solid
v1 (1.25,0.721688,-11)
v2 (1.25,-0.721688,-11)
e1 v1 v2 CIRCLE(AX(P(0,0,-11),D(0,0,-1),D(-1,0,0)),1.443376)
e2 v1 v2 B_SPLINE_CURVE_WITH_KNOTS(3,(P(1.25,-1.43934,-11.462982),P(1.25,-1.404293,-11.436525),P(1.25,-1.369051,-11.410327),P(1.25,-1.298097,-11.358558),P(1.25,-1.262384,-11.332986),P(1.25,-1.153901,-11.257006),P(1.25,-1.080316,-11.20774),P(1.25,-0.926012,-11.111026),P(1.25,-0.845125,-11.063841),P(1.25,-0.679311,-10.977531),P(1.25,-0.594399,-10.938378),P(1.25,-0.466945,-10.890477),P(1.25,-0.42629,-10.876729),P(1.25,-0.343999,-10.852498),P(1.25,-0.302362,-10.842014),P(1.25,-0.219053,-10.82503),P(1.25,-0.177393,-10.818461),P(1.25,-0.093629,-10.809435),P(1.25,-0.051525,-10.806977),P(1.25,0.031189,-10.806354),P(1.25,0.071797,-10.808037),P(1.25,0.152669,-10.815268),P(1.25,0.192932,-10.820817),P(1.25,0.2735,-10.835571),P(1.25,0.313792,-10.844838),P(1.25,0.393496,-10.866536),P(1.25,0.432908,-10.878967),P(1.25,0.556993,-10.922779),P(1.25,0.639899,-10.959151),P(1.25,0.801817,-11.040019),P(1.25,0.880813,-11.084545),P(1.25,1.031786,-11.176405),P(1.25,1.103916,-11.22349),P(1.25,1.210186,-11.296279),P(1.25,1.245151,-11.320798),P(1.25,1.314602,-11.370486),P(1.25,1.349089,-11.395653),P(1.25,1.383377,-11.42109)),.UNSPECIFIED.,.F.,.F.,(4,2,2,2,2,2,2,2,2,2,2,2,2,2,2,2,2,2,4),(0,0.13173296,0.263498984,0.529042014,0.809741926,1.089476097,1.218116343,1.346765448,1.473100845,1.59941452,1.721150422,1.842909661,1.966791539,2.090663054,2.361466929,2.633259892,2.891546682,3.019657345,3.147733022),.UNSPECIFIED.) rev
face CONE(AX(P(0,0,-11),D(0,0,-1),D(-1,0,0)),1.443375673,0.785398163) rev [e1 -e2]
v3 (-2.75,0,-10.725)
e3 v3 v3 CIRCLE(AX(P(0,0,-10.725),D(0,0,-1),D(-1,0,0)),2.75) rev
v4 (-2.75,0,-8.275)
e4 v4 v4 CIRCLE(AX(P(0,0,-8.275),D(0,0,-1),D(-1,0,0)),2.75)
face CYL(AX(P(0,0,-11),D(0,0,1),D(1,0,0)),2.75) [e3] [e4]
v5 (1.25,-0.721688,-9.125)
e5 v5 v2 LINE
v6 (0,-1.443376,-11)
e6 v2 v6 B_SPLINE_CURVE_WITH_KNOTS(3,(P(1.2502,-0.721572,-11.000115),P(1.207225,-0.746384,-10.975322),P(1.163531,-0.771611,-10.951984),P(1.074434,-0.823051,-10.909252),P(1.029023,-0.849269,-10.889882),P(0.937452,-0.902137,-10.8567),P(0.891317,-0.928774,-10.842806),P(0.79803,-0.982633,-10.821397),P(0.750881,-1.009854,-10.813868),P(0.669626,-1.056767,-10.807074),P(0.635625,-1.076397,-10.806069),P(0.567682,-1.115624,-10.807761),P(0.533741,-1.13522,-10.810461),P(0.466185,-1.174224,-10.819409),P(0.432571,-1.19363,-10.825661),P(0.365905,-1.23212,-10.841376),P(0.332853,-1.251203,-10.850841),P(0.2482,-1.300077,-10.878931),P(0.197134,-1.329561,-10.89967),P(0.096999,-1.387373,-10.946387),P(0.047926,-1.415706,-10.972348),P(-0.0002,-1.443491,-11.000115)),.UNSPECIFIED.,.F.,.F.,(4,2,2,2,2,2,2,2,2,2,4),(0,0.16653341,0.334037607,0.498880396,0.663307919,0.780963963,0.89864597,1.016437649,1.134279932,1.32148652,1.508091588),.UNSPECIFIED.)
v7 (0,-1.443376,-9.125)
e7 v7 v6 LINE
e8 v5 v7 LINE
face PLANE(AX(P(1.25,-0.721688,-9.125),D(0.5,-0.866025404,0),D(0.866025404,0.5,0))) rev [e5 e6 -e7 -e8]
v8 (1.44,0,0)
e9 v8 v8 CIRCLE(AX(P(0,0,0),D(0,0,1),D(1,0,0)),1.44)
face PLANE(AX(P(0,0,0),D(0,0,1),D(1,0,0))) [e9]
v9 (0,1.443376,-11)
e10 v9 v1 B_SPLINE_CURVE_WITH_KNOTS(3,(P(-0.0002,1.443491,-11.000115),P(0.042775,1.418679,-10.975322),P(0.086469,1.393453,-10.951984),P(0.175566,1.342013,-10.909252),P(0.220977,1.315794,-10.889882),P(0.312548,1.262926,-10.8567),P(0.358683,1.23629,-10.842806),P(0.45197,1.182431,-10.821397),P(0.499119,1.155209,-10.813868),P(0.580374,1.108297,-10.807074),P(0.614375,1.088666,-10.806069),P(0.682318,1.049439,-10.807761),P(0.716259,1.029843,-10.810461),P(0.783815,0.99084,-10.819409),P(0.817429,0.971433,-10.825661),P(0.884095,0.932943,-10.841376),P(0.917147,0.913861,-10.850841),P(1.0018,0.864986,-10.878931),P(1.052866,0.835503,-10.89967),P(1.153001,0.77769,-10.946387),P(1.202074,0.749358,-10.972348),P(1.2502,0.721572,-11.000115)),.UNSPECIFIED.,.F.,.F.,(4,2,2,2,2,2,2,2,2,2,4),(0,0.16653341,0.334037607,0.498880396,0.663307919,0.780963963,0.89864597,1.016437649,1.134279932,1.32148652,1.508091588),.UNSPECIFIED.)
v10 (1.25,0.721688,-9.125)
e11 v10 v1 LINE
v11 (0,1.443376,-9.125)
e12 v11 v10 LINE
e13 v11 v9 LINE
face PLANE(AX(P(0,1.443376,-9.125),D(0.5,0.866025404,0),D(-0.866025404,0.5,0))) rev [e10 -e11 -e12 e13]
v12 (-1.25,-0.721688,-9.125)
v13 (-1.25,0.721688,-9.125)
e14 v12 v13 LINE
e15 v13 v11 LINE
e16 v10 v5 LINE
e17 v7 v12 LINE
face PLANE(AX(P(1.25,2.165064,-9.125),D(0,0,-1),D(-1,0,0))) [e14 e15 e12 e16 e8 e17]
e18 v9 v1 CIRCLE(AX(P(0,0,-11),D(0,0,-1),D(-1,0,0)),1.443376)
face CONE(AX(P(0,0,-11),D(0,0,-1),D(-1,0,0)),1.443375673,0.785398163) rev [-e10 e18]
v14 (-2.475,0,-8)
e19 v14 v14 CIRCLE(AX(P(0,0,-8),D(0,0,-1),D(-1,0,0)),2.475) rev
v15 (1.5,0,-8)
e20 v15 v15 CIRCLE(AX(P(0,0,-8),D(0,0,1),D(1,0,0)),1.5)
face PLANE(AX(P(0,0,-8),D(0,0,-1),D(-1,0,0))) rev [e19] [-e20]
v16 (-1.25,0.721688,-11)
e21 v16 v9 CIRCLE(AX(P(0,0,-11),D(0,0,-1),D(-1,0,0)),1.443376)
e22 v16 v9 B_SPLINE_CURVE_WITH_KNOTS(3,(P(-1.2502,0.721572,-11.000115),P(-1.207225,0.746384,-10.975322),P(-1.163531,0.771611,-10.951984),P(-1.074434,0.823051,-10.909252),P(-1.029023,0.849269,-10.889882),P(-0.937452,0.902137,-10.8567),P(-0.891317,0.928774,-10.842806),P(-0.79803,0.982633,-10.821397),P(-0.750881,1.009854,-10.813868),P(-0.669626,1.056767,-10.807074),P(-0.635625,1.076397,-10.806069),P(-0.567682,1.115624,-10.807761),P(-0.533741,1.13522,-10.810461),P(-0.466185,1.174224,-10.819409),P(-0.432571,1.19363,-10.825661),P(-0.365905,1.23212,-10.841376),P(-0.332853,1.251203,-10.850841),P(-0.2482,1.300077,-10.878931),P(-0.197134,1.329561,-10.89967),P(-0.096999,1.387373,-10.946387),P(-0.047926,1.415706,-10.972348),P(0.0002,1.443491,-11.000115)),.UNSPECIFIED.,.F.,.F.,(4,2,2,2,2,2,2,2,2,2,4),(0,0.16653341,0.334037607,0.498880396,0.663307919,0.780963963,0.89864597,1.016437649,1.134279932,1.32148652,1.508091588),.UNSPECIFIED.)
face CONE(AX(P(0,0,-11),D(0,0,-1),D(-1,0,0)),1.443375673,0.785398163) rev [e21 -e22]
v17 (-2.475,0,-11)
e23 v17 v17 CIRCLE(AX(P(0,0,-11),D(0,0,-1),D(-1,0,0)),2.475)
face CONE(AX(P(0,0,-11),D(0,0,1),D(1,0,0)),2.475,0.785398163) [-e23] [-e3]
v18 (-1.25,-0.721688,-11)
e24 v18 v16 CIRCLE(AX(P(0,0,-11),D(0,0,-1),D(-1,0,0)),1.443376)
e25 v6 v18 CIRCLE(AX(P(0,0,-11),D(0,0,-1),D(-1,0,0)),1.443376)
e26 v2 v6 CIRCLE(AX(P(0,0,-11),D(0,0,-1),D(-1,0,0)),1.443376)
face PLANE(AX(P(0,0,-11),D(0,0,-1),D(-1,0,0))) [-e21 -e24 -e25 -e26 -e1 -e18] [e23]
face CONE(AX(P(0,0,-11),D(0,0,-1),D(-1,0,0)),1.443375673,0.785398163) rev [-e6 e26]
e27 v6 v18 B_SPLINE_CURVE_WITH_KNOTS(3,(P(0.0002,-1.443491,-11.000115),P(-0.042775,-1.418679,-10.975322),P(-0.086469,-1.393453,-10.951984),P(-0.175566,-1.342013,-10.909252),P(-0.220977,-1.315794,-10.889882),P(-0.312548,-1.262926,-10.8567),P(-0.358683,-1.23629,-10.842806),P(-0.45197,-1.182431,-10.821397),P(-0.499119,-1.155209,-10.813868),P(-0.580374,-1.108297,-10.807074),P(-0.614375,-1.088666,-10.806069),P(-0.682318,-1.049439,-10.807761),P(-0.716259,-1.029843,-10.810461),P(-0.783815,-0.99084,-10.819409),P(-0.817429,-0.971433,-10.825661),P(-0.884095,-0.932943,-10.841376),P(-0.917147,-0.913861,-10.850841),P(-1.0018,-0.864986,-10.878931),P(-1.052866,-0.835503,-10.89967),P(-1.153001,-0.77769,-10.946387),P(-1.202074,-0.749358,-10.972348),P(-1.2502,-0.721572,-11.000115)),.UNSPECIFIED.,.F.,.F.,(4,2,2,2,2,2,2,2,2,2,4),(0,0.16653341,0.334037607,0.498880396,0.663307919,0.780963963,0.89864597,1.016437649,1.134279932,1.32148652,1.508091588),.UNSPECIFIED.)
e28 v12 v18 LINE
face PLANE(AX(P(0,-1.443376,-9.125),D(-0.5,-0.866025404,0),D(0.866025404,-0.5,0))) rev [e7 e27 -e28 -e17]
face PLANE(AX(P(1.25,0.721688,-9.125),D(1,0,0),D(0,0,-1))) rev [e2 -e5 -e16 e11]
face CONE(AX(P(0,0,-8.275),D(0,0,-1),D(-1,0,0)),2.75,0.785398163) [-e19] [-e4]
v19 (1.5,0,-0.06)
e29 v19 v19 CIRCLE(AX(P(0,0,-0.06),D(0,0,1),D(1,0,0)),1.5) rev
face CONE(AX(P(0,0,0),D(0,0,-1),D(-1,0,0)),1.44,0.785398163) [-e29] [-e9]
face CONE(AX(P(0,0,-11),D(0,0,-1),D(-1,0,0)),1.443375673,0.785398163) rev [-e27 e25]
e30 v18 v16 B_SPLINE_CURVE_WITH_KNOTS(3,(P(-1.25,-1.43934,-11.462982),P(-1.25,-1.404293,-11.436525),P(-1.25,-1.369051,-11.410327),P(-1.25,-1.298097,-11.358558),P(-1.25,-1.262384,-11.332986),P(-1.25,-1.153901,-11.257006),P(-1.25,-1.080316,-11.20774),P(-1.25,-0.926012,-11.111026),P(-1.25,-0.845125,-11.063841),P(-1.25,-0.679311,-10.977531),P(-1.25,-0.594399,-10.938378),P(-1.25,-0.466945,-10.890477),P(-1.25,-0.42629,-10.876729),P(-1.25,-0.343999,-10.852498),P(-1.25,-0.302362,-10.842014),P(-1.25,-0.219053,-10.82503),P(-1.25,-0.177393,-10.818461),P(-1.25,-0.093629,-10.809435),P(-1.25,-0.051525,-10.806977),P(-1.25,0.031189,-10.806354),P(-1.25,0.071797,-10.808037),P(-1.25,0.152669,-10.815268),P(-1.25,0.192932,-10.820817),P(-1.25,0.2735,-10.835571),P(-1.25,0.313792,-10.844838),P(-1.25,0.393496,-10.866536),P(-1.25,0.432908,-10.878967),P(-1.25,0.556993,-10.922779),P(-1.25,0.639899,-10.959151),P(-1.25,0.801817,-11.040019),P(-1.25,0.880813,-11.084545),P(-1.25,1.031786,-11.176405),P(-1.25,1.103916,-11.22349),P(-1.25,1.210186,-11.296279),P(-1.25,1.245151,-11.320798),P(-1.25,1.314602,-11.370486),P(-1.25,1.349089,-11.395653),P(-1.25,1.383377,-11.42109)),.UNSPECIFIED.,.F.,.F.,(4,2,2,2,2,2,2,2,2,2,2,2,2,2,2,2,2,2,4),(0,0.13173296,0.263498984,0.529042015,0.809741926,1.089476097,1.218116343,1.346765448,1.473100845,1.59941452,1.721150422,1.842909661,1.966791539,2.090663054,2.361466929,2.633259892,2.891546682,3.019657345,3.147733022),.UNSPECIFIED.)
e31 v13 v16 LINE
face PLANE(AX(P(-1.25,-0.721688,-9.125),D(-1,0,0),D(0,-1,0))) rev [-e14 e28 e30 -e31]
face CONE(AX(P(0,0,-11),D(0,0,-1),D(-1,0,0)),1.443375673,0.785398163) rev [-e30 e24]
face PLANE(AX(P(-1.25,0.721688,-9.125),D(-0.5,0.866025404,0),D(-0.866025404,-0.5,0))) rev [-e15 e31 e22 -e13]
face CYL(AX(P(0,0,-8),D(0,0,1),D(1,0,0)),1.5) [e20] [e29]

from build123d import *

# Parameters (mm, degrees)
SKETCH1_R            = 1.5
EXTRUDE1_DEPTH       = 8
CUT_SWEEP1_PITCH     = 0.5
SKETCH6_R            = 2.75
EXTRUDE2_DEPTH       = 3
CUT_EXTRUDE1_DEPTH   = 1.875
CHAMFER1_SIZE        = 0.275
SKETCH10_R           = 1.5
PARTIAL_THREAD_DEPTH = 8
CHAMFER2_SIZE        = 0.06


with BuildPart() as part:
    # Sketch1 → Extrude1 (new body)
    with BuildSketch(Plane.XY):
        Circle(SKETCH1_R)
    extrude(amount=-EXTRUDE1_DEPTH)

    # Cut-Sweep1: the profile of Sketch3 profile screwed along a right-hand helix of 17 turns, 6 arcs to a turn; built about Z, then put on its axis
    cut_sweep1_z = Axis((0, 0, 0), (0, 0, 1))
    cut_sweep1_corners = [(1.5003, 0, -0.437673205), (1.175240474, 0, -0.25), (1.175240474, 0, -0.1875), (1.5003, 0, 0.000173205)]
    with BuildLine(mode=Mode.PRIVATE) as cut_sweep1_profile:
        Line(cut_sweep1_corners[0], cut_sweep1_corners[1])
        Line(cut_sweep1_corners[1], cut_sweep1_corners[2])
        Line(cut_sweep1_corners[2], cut_sweep1_corners[3])
        Line(cut_sweep1_corners[3], cut_sweep1_corners[0])
    cut_sweep1_cap = Face(cut_sweep1_profile.wire())
    cut_sweep1_turn_angles = [0, 30, 60, 90, 120, 150, 180, 210, 240, 270, 300, 330, 360]
    cut_sweep1_turn_weights = [1, 0.8660254037844387, 1, 0.8660254037844387, 1, 0.8660254037844387, 1, 0.8660254037844387, 1, 0.8660254037844387, 1, 0.8660254037844387, 1]
    cut_sweep1_turn_rails = [Edge.make_bspline([Vector(p[0], p[1], 0).rotate(cut_sweep1_z, cut_sweep1_turn_angles[k]) / cut_sweep1_turn_weights[k] + Vector(0, 0, p[2] + CUT_SWEEP1_PITCH * cut_sweep1_turn_angles[k] / 360) for k in range(13)], [0, 0, 0, 1, 1, 2, 2, 3, 3, 4, 4, 5, 5, 6, 6, 6], 2, cut_sweep1_turn_weights) for p in cut_sweep1_corners]
    cut_sweep1_turn_sides = [Face.make_surface_from_curves(cut_sweep1_turn_rails[p[0]], cut_sweep1_turn_rails[p[1]]) for p in [(0, 1), (1, 2), (2, 3), (3, 0)]]
    cut_sweep1 = Plane(origin=(0, 0, 0), x_dir=(0, 1, 0), z_dir=(0, 0, -1)) * Solid(Shell([*[p.moved(Location((0, 0, CUT_SWEEP1_PITCH * i))) for i in range(17) for p in cut_sweep1_turn_sides], cut_sweep1_cap, cut_sweep1_cap.rotate(cut_sweep1_z, 6120).moved(Location((0, 0, CUT_SWEEP1_PITCH * 6120 / 360)))]))
    add(cut_sweep1, mode=Mode.SUBTRACT)

    # Sketch4 → Cut-Revolve1 (revolve, cut)
    with BuildSketch(Plane(origin=(0, 0, 0), x_dir=(0, 0, -1), z_dir=(1, 0, 0)), mode=Mode.PRIVATE) as cut_revolve1_sk:
        Polygon((0.405251783, 1.5), (0, 0.921240474), (0, 1.5), align=None)
    revolve(cut_revolve1_sk.sketch.rotate(Axis((0, 0, 0), (0, 0, -1)), 270), axis=Axis((0, 0, 0), (0, 0, -1)), mode=Mode.SUBTRACT)

    # Sketch6 → Extrude2 (add)
    with BuildSketch(Plane(origin=(0, 0, -8), x_dir=(-1, 0, 0), z_dir=(0, 0, -1))):
        Circle(SKETCH6_R)
    extrude(amount=EXTRUDE2_DEPTH)

    # Sketch7 → Cut-Extrude1 (cut)
    with BuildSketch(Plane(origin=(0, 0, -11), x_dir=(-1, 0, 0), z_dir=(0, 0, -1))):
        Polygon((0, 1.443375673), (-1.25, 0.721687836), (-1.25, -0.721687836), (0, -1.443375673), (1.25, -0.721687836), (1.25, 0.721687836), align=None)
    extrude(amount=-CUT_EXTRUDE1_DEPTH, mode=Mode.SUBTRACT)

    # Cut-Extrude2 cone 1 section (through the dimple's axis) → Cut-Extrude2 (revolve, cut)
    with BuildSketch(Plane(origin=(0, 0, -11), x_dir=(0, 1, 0), z_dir=(1, 0, 0))):
        Polygon((0, 0), (1.443375673, 0), (0, 1.443375673), align=None)
    revolve(axis=Axis((0, 0, -11), (0, 0, 1)), mode=Mode.SUBTRACT)

    # Chamfer1
    chamfer1_edges = [part.edges().sort_by_distance(p)[0] for p in [
        (2.75, 0, -8),
        (2.75, 0, -11),
    ]]
    chamfer(chamfer1_edges, length=CHAMFER1_SIZE)


with BuildPart() as body_2:
    # Sketch10 → partial thread (new body)
    with BuildSketch(Plane.XY.offset(-8)):
        Circle(SKETCH10_R)
    extrude(amount=PARTIAL_THREAD_DEPTH)

    # Chamfer2
    chamfer2_edges = [body_2.edges().sort_by_distance(p)[0] for p in [
        (-1.5, 0, 0),
    ]]
    chamfer(chamfer2_edges, length=CHAMFER2_SIZE)


with BuildPart() as part_1:
    add(part.part)

    # Combine1: union body 2
    add(body_2.part)


solid = part_1.part
